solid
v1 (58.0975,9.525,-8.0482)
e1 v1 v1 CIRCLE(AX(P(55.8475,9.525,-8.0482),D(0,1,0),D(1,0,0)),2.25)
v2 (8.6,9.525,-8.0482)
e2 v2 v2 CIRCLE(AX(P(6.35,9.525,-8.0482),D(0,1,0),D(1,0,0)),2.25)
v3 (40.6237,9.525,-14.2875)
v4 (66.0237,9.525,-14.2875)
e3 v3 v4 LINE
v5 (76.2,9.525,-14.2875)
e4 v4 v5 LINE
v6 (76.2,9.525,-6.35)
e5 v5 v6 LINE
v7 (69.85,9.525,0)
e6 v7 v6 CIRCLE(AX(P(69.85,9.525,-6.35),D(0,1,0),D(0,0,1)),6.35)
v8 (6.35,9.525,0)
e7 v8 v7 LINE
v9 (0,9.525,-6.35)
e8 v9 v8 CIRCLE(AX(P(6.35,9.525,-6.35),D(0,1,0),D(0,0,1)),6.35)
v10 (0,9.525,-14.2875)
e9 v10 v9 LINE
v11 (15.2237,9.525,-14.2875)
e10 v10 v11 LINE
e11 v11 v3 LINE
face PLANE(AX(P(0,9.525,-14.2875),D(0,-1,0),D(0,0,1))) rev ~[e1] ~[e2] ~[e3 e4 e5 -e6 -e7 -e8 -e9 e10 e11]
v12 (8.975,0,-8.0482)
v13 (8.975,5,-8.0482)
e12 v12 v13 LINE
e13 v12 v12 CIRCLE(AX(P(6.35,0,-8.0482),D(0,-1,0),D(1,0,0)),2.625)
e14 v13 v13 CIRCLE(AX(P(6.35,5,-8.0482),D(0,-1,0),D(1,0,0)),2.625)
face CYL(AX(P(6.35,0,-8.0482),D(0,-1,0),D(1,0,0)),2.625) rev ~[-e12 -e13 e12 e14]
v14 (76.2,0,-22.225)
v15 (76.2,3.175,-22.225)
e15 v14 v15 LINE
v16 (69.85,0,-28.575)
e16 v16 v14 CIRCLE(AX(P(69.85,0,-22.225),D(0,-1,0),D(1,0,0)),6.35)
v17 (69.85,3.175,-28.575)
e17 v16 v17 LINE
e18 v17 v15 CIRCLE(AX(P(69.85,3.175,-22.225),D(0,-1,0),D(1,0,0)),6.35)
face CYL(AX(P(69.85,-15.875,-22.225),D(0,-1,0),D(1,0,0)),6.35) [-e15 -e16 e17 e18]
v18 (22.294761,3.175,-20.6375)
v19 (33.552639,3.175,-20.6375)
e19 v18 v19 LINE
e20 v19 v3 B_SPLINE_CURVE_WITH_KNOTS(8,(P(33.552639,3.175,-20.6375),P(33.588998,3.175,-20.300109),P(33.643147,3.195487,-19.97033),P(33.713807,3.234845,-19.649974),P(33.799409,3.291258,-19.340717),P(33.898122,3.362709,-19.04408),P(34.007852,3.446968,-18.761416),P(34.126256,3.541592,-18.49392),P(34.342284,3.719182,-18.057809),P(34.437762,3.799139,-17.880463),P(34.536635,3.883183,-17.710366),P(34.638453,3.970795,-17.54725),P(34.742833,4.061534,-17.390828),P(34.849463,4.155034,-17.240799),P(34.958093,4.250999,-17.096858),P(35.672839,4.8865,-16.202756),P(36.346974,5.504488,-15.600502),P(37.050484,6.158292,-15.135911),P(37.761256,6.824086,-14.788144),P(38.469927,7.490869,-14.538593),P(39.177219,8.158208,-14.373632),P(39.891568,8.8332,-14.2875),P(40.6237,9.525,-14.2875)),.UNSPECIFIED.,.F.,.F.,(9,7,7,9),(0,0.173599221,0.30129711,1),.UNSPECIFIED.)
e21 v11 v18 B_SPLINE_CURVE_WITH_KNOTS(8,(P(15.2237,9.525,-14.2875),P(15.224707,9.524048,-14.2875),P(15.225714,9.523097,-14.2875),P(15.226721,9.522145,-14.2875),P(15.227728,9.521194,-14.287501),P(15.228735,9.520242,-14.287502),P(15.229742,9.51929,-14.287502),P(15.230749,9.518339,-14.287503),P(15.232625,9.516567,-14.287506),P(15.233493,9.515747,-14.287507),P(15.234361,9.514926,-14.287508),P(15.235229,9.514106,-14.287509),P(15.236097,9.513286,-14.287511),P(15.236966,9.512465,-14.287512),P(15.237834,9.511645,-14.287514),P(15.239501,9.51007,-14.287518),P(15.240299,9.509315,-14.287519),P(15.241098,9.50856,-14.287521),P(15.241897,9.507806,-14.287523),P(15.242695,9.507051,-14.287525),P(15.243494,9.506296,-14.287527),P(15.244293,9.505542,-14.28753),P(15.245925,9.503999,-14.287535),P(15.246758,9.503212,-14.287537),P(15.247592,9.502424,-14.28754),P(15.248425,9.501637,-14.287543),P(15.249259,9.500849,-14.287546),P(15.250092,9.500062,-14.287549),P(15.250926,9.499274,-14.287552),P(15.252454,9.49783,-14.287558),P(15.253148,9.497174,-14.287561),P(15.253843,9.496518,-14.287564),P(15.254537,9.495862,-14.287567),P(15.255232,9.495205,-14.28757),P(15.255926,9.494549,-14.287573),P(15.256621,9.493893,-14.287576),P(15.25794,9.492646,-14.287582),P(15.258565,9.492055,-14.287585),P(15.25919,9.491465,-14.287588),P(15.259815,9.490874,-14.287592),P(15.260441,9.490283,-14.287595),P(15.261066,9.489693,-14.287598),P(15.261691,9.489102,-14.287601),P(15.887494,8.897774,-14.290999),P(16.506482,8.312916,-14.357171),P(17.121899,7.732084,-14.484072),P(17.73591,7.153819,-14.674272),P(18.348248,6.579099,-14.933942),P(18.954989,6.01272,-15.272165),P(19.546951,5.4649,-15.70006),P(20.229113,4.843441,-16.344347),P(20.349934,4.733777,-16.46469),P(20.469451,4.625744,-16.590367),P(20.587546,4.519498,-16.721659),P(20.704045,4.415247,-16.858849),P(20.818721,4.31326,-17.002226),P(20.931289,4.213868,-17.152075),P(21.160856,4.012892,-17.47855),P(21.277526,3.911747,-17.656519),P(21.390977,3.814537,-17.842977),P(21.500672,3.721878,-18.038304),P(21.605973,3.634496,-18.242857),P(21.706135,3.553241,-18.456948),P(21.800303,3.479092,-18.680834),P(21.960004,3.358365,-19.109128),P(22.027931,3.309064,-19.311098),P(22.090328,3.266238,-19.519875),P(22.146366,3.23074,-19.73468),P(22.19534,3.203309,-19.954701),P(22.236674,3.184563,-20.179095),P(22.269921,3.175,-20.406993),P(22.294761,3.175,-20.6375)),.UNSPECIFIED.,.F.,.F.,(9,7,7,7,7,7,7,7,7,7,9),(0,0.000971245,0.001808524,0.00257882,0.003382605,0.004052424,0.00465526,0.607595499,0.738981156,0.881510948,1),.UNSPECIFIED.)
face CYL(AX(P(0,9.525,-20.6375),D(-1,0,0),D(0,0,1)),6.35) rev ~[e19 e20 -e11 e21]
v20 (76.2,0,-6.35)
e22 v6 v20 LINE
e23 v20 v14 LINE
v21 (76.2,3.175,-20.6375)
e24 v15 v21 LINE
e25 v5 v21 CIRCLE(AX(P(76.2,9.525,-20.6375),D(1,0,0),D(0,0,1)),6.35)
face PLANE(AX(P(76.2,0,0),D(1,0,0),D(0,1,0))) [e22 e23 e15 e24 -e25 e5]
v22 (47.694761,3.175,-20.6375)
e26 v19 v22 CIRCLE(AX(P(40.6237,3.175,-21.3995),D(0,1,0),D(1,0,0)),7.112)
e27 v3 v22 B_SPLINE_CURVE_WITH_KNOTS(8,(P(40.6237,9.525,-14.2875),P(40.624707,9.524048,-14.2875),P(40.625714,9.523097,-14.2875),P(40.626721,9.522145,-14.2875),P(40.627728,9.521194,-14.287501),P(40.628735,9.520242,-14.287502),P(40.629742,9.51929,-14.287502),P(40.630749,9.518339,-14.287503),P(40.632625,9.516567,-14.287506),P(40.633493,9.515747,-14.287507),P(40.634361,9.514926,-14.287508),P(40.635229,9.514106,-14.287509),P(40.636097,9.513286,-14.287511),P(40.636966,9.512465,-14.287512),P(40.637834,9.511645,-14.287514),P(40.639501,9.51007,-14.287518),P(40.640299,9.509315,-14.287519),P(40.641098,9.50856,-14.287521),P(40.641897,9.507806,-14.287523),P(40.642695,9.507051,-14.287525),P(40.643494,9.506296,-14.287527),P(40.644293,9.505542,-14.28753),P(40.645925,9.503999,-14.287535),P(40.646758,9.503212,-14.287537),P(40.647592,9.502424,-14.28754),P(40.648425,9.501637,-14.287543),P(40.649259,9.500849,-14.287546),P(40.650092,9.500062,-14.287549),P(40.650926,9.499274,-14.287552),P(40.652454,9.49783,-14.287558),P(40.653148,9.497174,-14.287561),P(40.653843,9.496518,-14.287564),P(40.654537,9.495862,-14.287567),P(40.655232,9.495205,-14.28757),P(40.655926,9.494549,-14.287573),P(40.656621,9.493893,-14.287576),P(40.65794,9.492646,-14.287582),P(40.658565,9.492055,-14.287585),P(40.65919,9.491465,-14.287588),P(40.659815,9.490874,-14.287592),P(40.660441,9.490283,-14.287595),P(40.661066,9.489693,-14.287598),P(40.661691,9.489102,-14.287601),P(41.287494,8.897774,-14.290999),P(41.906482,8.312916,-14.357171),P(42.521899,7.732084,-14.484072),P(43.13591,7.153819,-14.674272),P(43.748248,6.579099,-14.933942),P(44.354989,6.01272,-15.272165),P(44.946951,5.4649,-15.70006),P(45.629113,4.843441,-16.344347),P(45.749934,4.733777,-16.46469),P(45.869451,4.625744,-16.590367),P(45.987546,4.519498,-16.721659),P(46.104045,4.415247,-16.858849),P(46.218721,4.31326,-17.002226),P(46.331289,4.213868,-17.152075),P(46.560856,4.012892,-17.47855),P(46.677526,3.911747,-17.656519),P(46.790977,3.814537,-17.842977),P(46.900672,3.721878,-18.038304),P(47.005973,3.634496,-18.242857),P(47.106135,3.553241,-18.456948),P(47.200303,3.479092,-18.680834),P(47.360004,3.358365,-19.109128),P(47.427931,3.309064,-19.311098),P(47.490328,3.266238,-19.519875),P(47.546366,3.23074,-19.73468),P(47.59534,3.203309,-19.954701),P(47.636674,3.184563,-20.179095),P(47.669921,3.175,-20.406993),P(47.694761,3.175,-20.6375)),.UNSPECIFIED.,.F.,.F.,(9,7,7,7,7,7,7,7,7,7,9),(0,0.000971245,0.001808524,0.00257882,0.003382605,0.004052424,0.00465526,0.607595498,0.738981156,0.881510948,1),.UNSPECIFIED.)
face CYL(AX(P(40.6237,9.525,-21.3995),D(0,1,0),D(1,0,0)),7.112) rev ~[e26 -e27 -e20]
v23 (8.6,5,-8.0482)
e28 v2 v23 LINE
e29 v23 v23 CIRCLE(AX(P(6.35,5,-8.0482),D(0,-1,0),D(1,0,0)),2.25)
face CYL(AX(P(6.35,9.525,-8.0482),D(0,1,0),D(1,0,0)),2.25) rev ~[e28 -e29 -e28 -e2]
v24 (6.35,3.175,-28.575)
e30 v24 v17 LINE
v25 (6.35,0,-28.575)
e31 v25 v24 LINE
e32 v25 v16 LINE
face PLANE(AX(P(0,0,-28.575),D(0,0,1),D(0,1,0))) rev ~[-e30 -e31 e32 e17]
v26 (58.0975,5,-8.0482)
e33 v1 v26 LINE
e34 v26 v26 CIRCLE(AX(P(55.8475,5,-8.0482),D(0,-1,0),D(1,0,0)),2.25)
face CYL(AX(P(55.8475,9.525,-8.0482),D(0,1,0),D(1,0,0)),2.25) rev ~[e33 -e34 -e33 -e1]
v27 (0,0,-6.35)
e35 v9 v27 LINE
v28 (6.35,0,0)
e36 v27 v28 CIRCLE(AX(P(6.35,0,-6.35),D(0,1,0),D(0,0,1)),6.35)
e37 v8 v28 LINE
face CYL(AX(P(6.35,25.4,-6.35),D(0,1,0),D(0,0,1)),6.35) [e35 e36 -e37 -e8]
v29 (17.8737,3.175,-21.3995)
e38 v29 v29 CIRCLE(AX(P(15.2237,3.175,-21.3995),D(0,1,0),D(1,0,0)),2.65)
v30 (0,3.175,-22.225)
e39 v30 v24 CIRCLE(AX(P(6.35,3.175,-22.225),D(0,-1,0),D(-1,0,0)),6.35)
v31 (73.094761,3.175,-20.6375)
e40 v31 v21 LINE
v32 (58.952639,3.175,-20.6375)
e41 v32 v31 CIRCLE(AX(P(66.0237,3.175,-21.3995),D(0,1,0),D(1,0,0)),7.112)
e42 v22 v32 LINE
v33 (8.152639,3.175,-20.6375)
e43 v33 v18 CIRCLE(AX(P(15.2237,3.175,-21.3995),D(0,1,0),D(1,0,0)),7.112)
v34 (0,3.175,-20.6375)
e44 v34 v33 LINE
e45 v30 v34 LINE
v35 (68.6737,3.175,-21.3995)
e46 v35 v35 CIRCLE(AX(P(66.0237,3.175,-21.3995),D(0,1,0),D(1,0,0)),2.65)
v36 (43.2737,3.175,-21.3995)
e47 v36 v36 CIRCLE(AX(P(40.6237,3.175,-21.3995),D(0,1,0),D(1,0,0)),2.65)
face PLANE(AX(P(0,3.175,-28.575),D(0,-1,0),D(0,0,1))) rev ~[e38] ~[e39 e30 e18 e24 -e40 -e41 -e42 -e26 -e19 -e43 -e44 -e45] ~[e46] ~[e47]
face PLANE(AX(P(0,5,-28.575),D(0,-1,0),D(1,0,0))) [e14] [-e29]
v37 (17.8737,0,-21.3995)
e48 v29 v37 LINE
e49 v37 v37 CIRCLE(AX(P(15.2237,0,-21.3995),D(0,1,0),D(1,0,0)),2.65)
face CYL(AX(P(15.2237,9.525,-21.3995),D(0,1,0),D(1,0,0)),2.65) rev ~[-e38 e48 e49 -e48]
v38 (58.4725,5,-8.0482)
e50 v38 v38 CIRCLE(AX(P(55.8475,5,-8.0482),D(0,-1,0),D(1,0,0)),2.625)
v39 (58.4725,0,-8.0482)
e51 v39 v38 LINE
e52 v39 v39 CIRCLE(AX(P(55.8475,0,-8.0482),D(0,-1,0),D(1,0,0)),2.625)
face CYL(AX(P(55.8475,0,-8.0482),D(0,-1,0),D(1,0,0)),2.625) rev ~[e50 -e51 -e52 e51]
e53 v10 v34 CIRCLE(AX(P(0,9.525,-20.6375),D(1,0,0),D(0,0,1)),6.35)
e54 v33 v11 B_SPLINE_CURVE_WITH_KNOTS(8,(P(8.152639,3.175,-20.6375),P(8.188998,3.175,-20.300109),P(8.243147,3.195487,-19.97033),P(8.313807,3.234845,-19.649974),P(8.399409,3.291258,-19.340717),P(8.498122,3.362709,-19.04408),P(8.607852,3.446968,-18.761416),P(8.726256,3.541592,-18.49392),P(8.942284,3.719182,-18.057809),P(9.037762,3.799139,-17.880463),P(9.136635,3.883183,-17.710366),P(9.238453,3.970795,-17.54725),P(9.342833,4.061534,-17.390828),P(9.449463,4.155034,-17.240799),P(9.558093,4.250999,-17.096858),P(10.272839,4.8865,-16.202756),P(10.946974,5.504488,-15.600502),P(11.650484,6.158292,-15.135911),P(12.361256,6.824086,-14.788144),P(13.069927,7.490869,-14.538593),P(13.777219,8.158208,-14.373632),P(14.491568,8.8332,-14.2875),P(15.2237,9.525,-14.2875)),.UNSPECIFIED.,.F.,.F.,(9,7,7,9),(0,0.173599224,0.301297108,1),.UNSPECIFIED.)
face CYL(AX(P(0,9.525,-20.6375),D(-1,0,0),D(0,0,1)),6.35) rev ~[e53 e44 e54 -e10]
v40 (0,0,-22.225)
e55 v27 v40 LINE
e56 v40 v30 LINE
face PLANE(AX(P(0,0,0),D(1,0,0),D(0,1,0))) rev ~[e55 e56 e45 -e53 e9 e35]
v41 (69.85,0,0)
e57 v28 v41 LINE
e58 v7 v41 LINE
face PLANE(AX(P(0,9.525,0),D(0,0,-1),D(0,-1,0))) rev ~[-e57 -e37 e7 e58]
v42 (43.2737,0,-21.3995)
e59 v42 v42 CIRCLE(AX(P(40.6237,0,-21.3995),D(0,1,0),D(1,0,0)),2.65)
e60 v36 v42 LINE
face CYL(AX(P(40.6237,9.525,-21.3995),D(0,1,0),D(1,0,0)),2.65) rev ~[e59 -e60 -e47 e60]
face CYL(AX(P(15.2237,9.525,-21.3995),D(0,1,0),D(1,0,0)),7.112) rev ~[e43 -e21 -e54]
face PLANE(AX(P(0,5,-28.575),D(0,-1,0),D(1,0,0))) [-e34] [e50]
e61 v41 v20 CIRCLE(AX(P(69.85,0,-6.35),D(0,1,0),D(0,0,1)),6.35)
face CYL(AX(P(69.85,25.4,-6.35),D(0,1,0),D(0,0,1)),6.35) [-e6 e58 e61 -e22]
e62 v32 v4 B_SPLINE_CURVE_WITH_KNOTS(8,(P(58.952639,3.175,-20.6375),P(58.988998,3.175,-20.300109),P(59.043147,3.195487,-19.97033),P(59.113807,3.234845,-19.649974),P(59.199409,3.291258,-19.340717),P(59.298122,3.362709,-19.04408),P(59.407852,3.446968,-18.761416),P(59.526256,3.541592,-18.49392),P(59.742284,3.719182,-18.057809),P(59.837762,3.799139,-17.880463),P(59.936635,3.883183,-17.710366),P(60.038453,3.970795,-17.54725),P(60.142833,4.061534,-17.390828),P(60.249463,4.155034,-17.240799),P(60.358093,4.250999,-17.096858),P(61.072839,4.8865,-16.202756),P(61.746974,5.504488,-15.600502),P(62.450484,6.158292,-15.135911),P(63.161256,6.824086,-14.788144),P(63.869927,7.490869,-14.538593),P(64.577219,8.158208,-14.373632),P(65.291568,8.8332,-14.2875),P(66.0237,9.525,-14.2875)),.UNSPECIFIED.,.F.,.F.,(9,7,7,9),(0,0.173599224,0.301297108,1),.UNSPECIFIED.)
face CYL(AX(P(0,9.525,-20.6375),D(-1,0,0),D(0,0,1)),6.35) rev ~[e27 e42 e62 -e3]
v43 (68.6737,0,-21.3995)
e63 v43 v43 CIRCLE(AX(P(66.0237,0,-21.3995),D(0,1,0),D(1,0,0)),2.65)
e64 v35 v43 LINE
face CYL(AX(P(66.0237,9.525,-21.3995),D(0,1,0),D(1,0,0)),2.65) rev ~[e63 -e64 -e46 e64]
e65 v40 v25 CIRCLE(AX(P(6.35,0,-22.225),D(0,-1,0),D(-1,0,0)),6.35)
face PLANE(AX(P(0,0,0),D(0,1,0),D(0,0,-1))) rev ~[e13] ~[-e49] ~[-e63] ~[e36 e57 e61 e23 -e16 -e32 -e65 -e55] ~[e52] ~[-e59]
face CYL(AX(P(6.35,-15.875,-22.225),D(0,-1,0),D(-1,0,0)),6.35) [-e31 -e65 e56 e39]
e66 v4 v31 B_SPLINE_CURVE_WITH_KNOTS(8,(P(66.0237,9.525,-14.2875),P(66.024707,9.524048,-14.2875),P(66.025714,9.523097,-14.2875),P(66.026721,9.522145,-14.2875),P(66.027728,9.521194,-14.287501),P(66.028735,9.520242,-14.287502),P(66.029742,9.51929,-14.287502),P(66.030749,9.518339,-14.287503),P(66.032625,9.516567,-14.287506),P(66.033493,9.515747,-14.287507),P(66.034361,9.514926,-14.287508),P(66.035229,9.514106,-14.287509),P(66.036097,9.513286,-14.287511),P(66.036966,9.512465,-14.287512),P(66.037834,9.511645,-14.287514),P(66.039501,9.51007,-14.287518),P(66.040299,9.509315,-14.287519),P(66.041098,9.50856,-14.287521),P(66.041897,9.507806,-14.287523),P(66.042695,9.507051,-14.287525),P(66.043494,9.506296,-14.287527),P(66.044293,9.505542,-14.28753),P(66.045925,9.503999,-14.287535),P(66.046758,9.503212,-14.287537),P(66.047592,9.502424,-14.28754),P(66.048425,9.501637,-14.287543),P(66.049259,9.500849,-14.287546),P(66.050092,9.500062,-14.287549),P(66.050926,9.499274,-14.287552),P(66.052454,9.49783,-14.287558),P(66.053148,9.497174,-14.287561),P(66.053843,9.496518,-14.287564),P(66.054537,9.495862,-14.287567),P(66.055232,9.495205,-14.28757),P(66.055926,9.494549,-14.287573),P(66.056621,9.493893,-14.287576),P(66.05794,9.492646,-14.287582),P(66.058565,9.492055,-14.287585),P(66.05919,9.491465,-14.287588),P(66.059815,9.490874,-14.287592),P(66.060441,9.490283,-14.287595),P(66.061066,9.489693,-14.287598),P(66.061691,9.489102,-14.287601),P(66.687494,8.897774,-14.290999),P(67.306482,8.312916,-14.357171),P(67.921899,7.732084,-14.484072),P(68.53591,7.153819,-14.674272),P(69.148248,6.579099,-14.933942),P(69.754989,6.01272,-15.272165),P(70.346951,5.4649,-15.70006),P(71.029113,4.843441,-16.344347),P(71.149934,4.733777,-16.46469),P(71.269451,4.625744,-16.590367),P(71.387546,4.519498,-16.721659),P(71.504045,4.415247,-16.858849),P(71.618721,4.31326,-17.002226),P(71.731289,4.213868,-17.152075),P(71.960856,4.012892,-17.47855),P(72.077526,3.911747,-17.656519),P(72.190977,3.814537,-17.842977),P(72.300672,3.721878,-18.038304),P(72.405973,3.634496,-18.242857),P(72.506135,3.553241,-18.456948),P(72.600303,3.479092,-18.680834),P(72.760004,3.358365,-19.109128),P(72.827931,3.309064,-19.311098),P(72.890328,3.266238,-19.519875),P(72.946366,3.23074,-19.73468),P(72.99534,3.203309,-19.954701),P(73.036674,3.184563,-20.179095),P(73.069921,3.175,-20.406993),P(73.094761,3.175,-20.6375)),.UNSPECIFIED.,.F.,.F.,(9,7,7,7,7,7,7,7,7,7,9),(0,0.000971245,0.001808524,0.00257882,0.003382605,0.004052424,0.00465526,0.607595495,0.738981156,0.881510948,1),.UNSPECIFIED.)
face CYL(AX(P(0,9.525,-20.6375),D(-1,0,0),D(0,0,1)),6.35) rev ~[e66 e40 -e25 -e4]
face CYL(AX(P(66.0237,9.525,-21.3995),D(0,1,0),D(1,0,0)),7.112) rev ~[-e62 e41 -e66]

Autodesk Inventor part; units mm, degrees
ref_plane "YZ Plane" through (0, 0, 0) normal (1, 0, 0) x (0, 1, 0)
ref_plane "XZ Plane" through (0, 0, 0) normal (0, 1, 0) x (-1, 0, 0)
ref_plane "XY Plane" through (0, 0, 0) normal (0, 0, 1) x (1, 0, 0)
sketch "Sketch1" plane through (0, 0, 0) normal (1, 0, 0) x (0, 1, 0)
  line L0 (0, 0) -> (0, -28.575)
  line L1 (0, -28.575) -> (3.175, -28.575)
  line L2 (3.175, -28.575) -> (3.175, -14.2875)
  line L3 (3.175, -14.2875) -> (9.525, -14.2875)
  line L4 (9.525, -14.2875) -> (9.525, 0)
  line L5 (9.525, 0) -> (0, 0)
  point P0 (0, -14.2875)
  dimension "d0" = 3.175
  dimension "d1" = 9.525
  dimension "d2" = 28.575
extrude "Extrusion1" add sketch "Sketch1" along normal blind 76.2
sketch "Sketch2" plane through (0, 9.525, 0) normal (0, 1, 0) x (1, 0, 0)
  circle A0 centre (15.2237, 21.3995) radius 2.65
  circle A1 centre (40.6237, 21.3995) radius 2.65
  circle A2 centre (66.0237, 21.3995) radius 2.65
  circle A3 centre (55.8475, 8.0482) radius 2.25
  circle A4 centre (6.35, 8.0482) radius 2.25
  line L0 (0, 28.575) -> (0, 14.2875) projected
  line L1 (0, 14.2875) -> (0, 0) projected
  line L2 (0, 14.2875) -> (76.2, 14.2875) projected
  point P0 (0, 21.4313)
  point P1 (0, 7.1438)
  dimension "d5" = 5.3
  dimension "d6" = 25.4
  dimension "d7" = 25.4
  dimension "d8" = 49.4975
  dimension "d9" = 4.5
  dimension "d10" = 13.3513
  dimension "d11" = 8.8737
  dimension "d13" = 7.112
  dimension "d14" = 6.35
extrude "Extrusion2" cut sketch "Sketch2" against normal through all
sketch "Sketch3" plane through (0, 0, -28.575) normal (0, -1, 0) x (1, 0, 0)
  circle A0 centre (55.8475, 20.5268) radius 2.25 projected
  circle A1 centre (55.8475, 20.5268) radius 2.625
  circle A2 centre (6.35, 20.5268) radius 2.25 projected
  circle A3 centre (6.35, 20.5268) radius 2.625
  point P0 (0, 28.575)
  dimension "d17" = 5.25
  dimension "d18" = 5.25
extrude "Extrusion3" cut sketch "Sketch3" against normal blind 5
fillet "Fillet1" radius 6.35 5 edges at (76.2, 4.7625, 0) (38.1, 3.175, -14.2875) (76.2, 1.5875, -28.575) (0, 1.5875, -28.575) (0, 4.7625, 0)
sketch "Sketch4" plane through (0, 9.525, -6.35) normal (0, 1, 0) x (1, 0, 0)
  arc A0 (6.35, 22.225) -> (0, 15.875) centre (6.35, 15.875) ccw projected
  line L0 (0, 15.875) -> (0, 14.2875) projected
  line L1 (12.6857, 14.2875) -> (0, 14.2875) projected
  arc A1 (17.7618, 14.2875) -> (12.6857, 14.2875) centre (15.2237, 15.0495) ccw projected
  line L2 (38.0857, 14.2875) -> (17.7618, 14.2875) projected
  arc A2 (43.1618, 14.2875) -> (38.0857, 14.2875) centre (40.6237, 15.0495) ccw projected
  line L3 (63.4857, 14.2875) -> (43.1618, 14.2875) projected
  arc A3 (68.5618, 14.2875) -> (63.4857, 14.2875) centre (66.0237, 15.0495) ccw projected
  line L4 (76.2, 14.2875) -> (68.5618, 14.2875) projected
  line L5 (76.2, 15.875) -> (76.2, 14.2875) projected
  arc A4 (76.2, 15.875) -> (69.85, 22.225) centre (69.85, 15.875) ccw projected
  line L6 (6.35, 22.225) -> (69.85, 22.225) projected
  circle A5 centre (15.2237, 15.0495) radius 7.112
  circle A6 centre (40.6237, 15.0495) radius 7.112
  circle A7 centre (66.0237, 15.0495) radius 7.112
  point P0 (0, -6.35)
  dimension "d22" = 14.224
  dimension "d23" = 14.224
  dimension "d24" = 14.224
extrude "Extrusion4" cut sketch "Sketch4" against normal up to surface (6.35 mm away) contours A5 L2 A1 L1 | L1 A1 L2 A5 | A7 L3 A3 L4 | L4 A3 L3 A7 | A6 L3 A2 L2 | L2 A2 L3 A6
equation "\"d7\" = d6"
properties part number "DriveMotorMount5"
